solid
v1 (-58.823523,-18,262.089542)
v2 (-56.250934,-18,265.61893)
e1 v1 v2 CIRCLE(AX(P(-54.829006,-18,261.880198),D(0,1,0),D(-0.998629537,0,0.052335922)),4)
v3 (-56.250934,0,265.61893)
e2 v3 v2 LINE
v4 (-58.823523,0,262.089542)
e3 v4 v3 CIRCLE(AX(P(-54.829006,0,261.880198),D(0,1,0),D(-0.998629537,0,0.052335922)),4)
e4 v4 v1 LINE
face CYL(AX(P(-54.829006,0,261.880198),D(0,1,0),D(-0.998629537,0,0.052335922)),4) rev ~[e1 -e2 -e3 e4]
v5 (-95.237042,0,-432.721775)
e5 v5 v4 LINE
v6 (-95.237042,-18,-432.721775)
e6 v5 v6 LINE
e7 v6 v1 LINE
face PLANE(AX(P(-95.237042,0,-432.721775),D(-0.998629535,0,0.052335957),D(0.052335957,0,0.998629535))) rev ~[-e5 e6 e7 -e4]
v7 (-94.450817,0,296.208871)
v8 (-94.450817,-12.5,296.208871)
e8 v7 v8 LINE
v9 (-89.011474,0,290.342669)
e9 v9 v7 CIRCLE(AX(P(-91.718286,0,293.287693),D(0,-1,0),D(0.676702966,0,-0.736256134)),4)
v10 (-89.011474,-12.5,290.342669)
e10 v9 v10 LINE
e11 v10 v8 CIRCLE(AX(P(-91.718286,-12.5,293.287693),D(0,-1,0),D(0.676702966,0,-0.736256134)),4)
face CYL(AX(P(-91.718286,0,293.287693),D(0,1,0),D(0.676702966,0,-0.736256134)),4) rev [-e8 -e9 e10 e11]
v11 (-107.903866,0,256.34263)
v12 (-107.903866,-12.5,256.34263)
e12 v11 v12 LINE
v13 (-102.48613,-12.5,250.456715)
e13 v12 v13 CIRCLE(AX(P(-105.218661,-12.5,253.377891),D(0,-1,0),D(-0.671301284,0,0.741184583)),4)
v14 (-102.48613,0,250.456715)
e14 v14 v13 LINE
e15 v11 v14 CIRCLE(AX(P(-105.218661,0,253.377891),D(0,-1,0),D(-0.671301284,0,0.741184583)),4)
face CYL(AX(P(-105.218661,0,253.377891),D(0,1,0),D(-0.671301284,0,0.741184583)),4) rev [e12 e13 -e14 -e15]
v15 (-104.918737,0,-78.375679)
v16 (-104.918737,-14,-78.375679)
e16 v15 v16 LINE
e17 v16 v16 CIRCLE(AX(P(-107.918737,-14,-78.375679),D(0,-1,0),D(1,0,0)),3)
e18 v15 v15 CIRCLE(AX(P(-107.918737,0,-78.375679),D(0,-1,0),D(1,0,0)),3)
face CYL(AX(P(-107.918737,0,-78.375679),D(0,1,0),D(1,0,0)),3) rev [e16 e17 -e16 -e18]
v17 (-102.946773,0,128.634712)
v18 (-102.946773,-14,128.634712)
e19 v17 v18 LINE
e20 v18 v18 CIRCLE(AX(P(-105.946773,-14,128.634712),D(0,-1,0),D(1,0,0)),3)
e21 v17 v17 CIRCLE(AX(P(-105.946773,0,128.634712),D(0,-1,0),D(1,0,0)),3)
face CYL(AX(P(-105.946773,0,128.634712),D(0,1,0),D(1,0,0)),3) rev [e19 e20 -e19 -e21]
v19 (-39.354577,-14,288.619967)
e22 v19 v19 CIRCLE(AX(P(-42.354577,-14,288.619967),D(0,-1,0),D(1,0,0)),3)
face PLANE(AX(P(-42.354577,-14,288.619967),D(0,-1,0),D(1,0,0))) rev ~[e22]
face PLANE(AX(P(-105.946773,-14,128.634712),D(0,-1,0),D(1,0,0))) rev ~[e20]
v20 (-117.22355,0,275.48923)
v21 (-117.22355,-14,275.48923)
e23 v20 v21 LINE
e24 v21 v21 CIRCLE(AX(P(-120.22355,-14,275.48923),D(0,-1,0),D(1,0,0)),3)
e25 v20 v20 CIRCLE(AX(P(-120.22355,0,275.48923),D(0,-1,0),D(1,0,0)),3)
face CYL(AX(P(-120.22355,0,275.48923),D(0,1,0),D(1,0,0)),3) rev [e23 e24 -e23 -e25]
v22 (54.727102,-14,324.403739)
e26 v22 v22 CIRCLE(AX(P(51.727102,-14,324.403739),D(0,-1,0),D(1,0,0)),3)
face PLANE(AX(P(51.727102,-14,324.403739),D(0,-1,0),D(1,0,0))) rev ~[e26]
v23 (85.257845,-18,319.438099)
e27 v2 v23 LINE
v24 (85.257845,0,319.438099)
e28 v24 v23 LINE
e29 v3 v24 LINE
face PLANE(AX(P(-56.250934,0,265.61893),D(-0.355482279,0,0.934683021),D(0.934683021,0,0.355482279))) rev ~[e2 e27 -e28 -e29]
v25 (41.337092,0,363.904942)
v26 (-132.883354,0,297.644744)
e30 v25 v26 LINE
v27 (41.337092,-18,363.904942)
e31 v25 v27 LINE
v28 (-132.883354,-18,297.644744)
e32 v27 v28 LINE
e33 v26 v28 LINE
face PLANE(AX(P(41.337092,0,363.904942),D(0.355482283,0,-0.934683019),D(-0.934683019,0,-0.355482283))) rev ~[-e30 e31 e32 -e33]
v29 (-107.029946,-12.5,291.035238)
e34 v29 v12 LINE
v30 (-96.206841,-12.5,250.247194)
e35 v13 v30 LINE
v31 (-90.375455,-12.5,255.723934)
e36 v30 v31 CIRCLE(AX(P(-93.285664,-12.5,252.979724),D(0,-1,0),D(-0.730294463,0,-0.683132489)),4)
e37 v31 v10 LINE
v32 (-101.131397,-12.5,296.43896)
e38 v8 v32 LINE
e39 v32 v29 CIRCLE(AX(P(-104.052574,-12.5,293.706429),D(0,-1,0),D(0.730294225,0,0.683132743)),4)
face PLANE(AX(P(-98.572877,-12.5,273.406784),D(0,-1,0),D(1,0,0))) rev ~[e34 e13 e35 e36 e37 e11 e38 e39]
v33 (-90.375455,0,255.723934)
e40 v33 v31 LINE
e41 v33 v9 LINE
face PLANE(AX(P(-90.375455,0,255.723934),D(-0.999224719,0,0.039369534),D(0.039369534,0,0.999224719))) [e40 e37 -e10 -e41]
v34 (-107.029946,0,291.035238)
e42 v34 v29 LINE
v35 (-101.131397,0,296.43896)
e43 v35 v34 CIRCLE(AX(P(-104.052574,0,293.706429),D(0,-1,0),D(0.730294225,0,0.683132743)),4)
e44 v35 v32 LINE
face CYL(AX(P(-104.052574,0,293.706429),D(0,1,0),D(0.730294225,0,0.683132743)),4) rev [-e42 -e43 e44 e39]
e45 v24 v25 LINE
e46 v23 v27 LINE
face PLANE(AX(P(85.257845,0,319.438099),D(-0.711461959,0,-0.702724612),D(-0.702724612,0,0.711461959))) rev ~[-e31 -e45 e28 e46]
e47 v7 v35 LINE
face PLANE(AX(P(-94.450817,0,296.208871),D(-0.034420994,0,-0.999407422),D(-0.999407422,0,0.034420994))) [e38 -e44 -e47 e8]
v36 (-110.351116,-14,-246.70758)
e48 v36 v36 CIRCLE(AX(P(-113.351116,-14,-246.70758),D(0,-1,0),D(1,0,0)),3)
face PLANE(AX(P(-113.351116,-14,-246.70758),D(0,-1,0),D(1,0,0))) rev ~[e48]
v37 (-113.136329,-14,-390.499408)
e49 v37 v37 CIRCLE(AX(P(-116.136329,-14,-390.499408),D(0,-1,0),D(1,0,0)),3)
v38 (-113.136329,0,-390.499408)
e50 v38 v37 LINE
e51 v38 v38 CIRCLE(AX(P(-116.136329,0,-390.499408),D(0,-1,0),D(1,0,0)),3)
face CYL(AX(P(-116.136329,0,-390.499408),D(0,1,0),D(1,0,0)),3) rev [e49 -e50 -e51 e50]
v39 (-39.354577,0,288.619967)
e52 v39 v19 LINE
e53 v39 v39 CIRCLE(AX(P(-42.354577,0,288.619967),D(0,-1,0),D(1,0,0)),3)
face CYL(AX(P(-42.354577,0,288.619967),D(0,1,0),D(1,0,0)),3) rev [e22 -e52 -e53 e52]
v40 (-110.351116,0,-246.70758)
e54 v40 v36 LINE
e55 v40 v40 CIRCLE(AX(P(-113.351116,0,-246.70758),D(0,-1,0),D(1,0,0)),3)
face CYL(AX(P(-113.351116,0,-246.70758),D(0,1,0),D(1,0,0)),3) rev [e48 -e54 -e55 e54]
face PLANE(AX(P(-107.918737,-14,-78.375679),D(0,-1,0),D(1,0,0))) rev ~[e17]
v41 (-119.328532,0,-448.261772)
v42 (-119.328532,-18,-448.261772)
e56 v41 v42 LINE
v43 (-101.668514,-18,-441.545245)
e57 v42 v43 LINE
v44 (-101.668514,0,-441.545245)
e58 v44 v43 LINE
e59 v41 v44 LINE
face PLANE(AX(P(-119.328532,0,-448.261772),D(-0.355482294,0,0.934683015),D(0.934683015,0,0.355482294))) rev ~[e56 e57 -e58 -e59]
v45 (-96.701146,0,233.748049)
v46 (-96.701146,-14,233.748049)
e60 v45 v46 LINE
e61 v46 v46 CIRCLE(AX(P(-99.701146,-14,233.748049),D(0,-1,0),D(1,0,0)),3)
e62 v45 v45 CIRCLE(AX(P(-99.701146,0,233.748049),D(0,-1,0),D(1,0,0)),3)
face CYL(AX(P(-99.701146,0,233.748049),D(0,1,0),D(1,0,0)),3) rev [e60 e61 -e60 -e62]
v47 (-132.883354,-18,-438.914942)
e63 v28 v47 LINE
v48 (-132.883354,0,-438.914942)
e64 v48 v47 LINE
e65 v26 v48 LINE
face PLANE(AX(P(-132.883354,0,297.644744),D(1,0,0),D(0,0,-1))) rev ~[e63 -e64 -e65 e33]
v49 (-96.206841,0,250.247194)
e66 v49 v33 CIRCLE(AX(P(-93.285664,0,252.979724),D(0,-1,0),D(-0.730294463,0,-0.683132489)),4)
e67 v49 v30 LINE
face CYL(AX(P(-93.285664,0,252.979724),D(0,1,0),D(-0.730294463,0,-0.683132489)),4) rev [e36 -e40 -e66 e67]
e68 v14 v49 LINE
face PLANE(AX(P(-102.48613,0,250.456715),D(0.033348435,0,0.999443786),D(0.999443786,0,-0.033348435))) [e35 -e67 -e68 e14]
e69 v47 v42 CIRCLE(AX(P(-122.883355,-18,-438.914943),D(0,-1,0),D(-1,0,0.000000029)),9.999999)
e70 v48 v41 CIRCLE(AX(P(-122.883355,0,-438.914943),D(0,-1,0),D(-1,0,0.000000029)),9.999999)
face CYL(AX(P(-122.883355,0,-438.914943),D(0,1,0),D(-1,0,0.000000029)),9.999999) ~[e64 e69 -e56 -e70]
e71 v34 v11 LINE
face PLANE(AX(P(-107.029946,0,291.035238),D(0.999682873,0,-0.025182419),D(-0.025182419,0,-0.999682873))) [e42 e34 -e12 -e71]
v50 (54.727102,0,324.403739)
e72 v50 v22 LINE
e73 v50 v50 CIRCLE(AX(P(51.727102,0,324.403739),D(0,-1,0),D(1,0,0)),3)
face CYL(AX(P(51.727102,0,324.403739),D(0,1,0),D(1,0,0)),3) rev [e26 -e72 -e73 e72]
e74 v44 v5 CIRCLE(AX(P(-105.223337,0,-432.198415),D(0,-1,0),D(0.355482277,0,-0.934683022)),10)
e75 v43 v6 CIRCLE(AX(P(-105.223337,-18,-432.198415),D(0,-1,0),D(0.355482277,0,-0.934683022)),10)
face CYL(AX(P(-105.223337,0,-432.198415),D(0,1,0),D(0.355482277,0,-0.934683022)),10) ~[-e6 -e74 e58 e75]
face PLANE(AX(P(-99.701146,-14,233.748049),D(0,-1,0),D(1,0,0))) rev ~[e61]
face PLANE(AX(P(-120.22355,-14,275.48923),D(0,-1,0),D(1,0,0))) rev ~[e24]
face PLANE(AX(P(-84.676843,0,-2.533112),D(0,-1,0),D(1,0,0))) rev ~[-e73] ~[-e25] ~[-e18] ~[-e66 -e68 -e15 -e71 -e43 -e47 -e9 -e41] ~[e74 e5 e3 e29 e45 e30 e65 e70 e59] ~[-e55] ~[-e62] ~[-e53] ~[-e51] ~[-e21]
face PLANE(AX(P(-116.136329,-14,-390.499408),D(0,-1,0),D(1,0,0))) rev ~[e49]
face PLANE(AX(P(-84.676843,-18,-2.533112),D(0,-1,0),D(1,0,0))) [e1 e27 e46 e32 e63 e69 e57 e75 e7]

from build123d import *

# Parameters (mm, degrees)
F0_R     = 3
F1_DEPTH = 18
F2_DEPTH = 14
F3_DEPTH = 12.5


# Not quite as in the source:
# - ends of sketch curves that miss each other by under 0.0002 mm in the source are joined


with BuildPart() as f1:
    # F0 (on Front) → F1 (new body)
    with BuildSketch(Plane.XZ):
        with BuildLine():
            Line((-119.3285324557, -448.2617723394), (-101.6685144557, -441.5452453394))
            ThreePointArc((-101.6685144557, -441.5452453394), (-97.1422559669, -438.0887567531), (-95.2370421293, -432.7217753041))
            Line((-95.2370421293, -432.7217753041), (-58.8235234557, 262.0895416606))
            ThreePointArc((-58.8235234557, 262.0895416606), (-58.06143799, 264.2363343101), (-56.250934498, 265.6189297718))
            Line((-56.250934498, 265.6189297718), (85.2578445443, 319.4380986606))
            Line((85.2578445443, 319.4380986606), (41.3370915443, 363.9049416606))
            Line((41.3370915443, 363.9049416606), (-132.8833544557, 297.6447436606))
            Line((-132.8833544557, 297.6447436606), (-132.8833544557, -438.9149423394))
            ThreePointArc((-132.8833544557, -438.9149423394), (-128.5601395631, -447.1474456551), (-119.3285324557, -448.2617723394))
        make_face()
        with Locations((-116.1363294557, -390.4994083394)):
            Circle(F0_R, mode=Mode.SUBTRACT)
        with Locations((-113.3511164557, -246.7075803394)):
            Circle(F0_R, mode=Mode.SUBTRACT)
        with Locations((-107.9187374557, -78.3756793394)):
            Circle(F0_R, mode=Mode.SUBTRACT)
        with Locations((-105.9467734557, 128.6347116606)):
            Circle(F0_R, mode=Mode.SUBTRACT)
        with Locations((-99.7011464557, 233.7480486606)):
            Circle(F0_R, mode=Mode.SUBTRACT)
        with Locations((-120.2235504557, 275.4892296606)):
            Circle(F0_R, mode=Mode.SUBTRACT)
        with BuildLine():
            ThreePointArc((-90.3754553764, 255.7239337355), (-90.5472879726, 250.0640248228), (-96.2068413545, 250.2471937553))
            Line((-96.2068413545, 250.2471937553), (-102.4861304557, 250.4567146606))
            ThreePointArc((-102.4861304557, 250.4567146606), (-108.1617141765, 250.6689360163), (-107.9038666822, 256.3426299107))
            Line((-107.9038666822, 256.3426299107), (-107.0299454557, 291.0352376606))
            ThreePointArc((-107.0299454557, 291.0352376606), (-106.7545815371, 296.6558621202), (-101.1313975225, 296.4389595982))
            Line((-101.1313975225, 296.4389595982), (-94.4508164557, 296.2088706606))
            ThreePointArc((-94.4508164557, 296.2088706606), (-88.7851572097, 296.0073908544), (-89.0114747479, 290.3426689785))
            Line((-89.0114747479, 290.3426689785), (-90.3754553764, 255.7239337355))
        make_face(mode=Mode.SUBTRACT)
        with Locations((-42.3545774557, 288.6199666606)):
            Circle(F0_R, mode=Mode.SUBTRACT)
        with Locations((51.7271015443, 324.4037386606)):
            Circle(F0_R, mode=Mode.SUBTRACT)
        with Locations((-116.1363294557, -390.4994083394)):
            Circle(F0_R)
        with Locations((-113.3511164557, -246.7075803394)):
            Circle(F0_R)
        with Locations((-107.9187374557, -78.3756793394)):
            Circle(F0_R)
        with Locations((-105.9467734557, 128.6347116606)):
            Circle(F0_R)
        with Locations((-120.2235504557, 275.4892296606)):
            Circle(F0_R)
        with Locations((-99.7011464557, 233.7480486606)):
            Circle(F0_R)
        with Locations((-42.3545774557, 288.6199666606)):
            Circle(F0_R)
        with Locations((51.7271015443, 324.4037386606)):
            Circle(F0_R)
        with BuildLine():
            Line((-102.4861304557, 250.4567146606), (-96.2068414557, 250.2471936606))
            ThreePointArc((-96.2068414557, 250.2471936606), (-90.5472879726, 250.0640248228), (-90.3754553764, 255.7239337355))
            Line((-90.3754553764, 255.7239337355), (-89.0114744557, 290.3426686606))
            ThreePointArc((-89.0114744557, 290.3426686606), (-88.7851572097, 296.0073908544), (-94.4508168599, 296.2088710928))
            Line((-94.4508168599, 296.2088710928), (-101.1313974557, 296.4389596606))
            ThreePointArc((-101.1313974557, 296.4389596606), (-106.7545815371, 296.6558621202), (-107.0299455087, 291.0352376131))
            Line((-107.0299455087, 291.0352376131), (-107.9038664557, 256.3426296606))
            ThreePointArc((-107.9038664557, 256.3426296606), (-108.1617141765, 250.6689360163), (-102.4861304557, 250.4567146606))
        make_face()
    extrude(amount=F1_DEPTH)

    # F0 (on Front) → F2 (cut)
    with BuildSketch(Plane.XZ):
        with Locations((-116.1363294557, -390.4994083394)):
            Circle(F0_R)
        with Locations((-113.3511164557, -246.7075803394)):
            Circle(F0_R)
        with Locations((-107.9187374557, -78.3756793394)):
            Circle(F0_R)
        with Locations((-105.9467734557, 128.6347116606)):
            Circle(F0_R)
        with Locations((-120.2235504557, 275.4892296606)):
            Circle(F0_R)
        with Locations((-99.7011464557, 233.7480486606)):
            Circle(F0_R)
        with Locations((-42.3545774557, 288.6199666606)):
            Circle(F0_R)
        with Locations((51.7271015443, 324.4037386606)):
            Circle(F0_R)
    extrude(amount=F2_DEPTH, mode=Mode.SUBTRACT)

    # F0 (on Front) → F3 (cut)
    with BuildSketch(Plane.XZ):
        with BuildLine():
            Line((-102.4861304557, 250.4567146606), (-96.2068414557, 250.2471936606))
            ThreePointArc((-96.2068414557, 250.2471936606), (-90.5472879726, 250.0640248228), (-90.3754553764, 255.7239337355))
            Line((-90.3754553764, 255.7239337355), (-89.0114744557, 290.3426686606))
            ThreePointArc((-89.0114744557, 290.3426686606), (-88.7851572097, 296.0073908544), (-94.4508168599, 296.2088710928))
            Line((-94.4508168599, 296.2088710928), (-101.1313974557, 296.4389596606))
            ThreePointArc((-101.1313974557, 296.4389596606), (-106.7545815371, 296.6558621202), (-107.0299455087, 291.0352376131))
            Line((-107.0299455087, 291.0352376131), (-107.9038664557, 256.3426296606))
            ThreePointArc((-107.9038664557, 256.3426296606), (-108.1617141765, 250.6689360163), (-102.4861304557, 250.4567146606))
        make_face()
    extrude(amount=F3_DEPTH, mode=Mode.SUBTRACT)


solid = f1.part
